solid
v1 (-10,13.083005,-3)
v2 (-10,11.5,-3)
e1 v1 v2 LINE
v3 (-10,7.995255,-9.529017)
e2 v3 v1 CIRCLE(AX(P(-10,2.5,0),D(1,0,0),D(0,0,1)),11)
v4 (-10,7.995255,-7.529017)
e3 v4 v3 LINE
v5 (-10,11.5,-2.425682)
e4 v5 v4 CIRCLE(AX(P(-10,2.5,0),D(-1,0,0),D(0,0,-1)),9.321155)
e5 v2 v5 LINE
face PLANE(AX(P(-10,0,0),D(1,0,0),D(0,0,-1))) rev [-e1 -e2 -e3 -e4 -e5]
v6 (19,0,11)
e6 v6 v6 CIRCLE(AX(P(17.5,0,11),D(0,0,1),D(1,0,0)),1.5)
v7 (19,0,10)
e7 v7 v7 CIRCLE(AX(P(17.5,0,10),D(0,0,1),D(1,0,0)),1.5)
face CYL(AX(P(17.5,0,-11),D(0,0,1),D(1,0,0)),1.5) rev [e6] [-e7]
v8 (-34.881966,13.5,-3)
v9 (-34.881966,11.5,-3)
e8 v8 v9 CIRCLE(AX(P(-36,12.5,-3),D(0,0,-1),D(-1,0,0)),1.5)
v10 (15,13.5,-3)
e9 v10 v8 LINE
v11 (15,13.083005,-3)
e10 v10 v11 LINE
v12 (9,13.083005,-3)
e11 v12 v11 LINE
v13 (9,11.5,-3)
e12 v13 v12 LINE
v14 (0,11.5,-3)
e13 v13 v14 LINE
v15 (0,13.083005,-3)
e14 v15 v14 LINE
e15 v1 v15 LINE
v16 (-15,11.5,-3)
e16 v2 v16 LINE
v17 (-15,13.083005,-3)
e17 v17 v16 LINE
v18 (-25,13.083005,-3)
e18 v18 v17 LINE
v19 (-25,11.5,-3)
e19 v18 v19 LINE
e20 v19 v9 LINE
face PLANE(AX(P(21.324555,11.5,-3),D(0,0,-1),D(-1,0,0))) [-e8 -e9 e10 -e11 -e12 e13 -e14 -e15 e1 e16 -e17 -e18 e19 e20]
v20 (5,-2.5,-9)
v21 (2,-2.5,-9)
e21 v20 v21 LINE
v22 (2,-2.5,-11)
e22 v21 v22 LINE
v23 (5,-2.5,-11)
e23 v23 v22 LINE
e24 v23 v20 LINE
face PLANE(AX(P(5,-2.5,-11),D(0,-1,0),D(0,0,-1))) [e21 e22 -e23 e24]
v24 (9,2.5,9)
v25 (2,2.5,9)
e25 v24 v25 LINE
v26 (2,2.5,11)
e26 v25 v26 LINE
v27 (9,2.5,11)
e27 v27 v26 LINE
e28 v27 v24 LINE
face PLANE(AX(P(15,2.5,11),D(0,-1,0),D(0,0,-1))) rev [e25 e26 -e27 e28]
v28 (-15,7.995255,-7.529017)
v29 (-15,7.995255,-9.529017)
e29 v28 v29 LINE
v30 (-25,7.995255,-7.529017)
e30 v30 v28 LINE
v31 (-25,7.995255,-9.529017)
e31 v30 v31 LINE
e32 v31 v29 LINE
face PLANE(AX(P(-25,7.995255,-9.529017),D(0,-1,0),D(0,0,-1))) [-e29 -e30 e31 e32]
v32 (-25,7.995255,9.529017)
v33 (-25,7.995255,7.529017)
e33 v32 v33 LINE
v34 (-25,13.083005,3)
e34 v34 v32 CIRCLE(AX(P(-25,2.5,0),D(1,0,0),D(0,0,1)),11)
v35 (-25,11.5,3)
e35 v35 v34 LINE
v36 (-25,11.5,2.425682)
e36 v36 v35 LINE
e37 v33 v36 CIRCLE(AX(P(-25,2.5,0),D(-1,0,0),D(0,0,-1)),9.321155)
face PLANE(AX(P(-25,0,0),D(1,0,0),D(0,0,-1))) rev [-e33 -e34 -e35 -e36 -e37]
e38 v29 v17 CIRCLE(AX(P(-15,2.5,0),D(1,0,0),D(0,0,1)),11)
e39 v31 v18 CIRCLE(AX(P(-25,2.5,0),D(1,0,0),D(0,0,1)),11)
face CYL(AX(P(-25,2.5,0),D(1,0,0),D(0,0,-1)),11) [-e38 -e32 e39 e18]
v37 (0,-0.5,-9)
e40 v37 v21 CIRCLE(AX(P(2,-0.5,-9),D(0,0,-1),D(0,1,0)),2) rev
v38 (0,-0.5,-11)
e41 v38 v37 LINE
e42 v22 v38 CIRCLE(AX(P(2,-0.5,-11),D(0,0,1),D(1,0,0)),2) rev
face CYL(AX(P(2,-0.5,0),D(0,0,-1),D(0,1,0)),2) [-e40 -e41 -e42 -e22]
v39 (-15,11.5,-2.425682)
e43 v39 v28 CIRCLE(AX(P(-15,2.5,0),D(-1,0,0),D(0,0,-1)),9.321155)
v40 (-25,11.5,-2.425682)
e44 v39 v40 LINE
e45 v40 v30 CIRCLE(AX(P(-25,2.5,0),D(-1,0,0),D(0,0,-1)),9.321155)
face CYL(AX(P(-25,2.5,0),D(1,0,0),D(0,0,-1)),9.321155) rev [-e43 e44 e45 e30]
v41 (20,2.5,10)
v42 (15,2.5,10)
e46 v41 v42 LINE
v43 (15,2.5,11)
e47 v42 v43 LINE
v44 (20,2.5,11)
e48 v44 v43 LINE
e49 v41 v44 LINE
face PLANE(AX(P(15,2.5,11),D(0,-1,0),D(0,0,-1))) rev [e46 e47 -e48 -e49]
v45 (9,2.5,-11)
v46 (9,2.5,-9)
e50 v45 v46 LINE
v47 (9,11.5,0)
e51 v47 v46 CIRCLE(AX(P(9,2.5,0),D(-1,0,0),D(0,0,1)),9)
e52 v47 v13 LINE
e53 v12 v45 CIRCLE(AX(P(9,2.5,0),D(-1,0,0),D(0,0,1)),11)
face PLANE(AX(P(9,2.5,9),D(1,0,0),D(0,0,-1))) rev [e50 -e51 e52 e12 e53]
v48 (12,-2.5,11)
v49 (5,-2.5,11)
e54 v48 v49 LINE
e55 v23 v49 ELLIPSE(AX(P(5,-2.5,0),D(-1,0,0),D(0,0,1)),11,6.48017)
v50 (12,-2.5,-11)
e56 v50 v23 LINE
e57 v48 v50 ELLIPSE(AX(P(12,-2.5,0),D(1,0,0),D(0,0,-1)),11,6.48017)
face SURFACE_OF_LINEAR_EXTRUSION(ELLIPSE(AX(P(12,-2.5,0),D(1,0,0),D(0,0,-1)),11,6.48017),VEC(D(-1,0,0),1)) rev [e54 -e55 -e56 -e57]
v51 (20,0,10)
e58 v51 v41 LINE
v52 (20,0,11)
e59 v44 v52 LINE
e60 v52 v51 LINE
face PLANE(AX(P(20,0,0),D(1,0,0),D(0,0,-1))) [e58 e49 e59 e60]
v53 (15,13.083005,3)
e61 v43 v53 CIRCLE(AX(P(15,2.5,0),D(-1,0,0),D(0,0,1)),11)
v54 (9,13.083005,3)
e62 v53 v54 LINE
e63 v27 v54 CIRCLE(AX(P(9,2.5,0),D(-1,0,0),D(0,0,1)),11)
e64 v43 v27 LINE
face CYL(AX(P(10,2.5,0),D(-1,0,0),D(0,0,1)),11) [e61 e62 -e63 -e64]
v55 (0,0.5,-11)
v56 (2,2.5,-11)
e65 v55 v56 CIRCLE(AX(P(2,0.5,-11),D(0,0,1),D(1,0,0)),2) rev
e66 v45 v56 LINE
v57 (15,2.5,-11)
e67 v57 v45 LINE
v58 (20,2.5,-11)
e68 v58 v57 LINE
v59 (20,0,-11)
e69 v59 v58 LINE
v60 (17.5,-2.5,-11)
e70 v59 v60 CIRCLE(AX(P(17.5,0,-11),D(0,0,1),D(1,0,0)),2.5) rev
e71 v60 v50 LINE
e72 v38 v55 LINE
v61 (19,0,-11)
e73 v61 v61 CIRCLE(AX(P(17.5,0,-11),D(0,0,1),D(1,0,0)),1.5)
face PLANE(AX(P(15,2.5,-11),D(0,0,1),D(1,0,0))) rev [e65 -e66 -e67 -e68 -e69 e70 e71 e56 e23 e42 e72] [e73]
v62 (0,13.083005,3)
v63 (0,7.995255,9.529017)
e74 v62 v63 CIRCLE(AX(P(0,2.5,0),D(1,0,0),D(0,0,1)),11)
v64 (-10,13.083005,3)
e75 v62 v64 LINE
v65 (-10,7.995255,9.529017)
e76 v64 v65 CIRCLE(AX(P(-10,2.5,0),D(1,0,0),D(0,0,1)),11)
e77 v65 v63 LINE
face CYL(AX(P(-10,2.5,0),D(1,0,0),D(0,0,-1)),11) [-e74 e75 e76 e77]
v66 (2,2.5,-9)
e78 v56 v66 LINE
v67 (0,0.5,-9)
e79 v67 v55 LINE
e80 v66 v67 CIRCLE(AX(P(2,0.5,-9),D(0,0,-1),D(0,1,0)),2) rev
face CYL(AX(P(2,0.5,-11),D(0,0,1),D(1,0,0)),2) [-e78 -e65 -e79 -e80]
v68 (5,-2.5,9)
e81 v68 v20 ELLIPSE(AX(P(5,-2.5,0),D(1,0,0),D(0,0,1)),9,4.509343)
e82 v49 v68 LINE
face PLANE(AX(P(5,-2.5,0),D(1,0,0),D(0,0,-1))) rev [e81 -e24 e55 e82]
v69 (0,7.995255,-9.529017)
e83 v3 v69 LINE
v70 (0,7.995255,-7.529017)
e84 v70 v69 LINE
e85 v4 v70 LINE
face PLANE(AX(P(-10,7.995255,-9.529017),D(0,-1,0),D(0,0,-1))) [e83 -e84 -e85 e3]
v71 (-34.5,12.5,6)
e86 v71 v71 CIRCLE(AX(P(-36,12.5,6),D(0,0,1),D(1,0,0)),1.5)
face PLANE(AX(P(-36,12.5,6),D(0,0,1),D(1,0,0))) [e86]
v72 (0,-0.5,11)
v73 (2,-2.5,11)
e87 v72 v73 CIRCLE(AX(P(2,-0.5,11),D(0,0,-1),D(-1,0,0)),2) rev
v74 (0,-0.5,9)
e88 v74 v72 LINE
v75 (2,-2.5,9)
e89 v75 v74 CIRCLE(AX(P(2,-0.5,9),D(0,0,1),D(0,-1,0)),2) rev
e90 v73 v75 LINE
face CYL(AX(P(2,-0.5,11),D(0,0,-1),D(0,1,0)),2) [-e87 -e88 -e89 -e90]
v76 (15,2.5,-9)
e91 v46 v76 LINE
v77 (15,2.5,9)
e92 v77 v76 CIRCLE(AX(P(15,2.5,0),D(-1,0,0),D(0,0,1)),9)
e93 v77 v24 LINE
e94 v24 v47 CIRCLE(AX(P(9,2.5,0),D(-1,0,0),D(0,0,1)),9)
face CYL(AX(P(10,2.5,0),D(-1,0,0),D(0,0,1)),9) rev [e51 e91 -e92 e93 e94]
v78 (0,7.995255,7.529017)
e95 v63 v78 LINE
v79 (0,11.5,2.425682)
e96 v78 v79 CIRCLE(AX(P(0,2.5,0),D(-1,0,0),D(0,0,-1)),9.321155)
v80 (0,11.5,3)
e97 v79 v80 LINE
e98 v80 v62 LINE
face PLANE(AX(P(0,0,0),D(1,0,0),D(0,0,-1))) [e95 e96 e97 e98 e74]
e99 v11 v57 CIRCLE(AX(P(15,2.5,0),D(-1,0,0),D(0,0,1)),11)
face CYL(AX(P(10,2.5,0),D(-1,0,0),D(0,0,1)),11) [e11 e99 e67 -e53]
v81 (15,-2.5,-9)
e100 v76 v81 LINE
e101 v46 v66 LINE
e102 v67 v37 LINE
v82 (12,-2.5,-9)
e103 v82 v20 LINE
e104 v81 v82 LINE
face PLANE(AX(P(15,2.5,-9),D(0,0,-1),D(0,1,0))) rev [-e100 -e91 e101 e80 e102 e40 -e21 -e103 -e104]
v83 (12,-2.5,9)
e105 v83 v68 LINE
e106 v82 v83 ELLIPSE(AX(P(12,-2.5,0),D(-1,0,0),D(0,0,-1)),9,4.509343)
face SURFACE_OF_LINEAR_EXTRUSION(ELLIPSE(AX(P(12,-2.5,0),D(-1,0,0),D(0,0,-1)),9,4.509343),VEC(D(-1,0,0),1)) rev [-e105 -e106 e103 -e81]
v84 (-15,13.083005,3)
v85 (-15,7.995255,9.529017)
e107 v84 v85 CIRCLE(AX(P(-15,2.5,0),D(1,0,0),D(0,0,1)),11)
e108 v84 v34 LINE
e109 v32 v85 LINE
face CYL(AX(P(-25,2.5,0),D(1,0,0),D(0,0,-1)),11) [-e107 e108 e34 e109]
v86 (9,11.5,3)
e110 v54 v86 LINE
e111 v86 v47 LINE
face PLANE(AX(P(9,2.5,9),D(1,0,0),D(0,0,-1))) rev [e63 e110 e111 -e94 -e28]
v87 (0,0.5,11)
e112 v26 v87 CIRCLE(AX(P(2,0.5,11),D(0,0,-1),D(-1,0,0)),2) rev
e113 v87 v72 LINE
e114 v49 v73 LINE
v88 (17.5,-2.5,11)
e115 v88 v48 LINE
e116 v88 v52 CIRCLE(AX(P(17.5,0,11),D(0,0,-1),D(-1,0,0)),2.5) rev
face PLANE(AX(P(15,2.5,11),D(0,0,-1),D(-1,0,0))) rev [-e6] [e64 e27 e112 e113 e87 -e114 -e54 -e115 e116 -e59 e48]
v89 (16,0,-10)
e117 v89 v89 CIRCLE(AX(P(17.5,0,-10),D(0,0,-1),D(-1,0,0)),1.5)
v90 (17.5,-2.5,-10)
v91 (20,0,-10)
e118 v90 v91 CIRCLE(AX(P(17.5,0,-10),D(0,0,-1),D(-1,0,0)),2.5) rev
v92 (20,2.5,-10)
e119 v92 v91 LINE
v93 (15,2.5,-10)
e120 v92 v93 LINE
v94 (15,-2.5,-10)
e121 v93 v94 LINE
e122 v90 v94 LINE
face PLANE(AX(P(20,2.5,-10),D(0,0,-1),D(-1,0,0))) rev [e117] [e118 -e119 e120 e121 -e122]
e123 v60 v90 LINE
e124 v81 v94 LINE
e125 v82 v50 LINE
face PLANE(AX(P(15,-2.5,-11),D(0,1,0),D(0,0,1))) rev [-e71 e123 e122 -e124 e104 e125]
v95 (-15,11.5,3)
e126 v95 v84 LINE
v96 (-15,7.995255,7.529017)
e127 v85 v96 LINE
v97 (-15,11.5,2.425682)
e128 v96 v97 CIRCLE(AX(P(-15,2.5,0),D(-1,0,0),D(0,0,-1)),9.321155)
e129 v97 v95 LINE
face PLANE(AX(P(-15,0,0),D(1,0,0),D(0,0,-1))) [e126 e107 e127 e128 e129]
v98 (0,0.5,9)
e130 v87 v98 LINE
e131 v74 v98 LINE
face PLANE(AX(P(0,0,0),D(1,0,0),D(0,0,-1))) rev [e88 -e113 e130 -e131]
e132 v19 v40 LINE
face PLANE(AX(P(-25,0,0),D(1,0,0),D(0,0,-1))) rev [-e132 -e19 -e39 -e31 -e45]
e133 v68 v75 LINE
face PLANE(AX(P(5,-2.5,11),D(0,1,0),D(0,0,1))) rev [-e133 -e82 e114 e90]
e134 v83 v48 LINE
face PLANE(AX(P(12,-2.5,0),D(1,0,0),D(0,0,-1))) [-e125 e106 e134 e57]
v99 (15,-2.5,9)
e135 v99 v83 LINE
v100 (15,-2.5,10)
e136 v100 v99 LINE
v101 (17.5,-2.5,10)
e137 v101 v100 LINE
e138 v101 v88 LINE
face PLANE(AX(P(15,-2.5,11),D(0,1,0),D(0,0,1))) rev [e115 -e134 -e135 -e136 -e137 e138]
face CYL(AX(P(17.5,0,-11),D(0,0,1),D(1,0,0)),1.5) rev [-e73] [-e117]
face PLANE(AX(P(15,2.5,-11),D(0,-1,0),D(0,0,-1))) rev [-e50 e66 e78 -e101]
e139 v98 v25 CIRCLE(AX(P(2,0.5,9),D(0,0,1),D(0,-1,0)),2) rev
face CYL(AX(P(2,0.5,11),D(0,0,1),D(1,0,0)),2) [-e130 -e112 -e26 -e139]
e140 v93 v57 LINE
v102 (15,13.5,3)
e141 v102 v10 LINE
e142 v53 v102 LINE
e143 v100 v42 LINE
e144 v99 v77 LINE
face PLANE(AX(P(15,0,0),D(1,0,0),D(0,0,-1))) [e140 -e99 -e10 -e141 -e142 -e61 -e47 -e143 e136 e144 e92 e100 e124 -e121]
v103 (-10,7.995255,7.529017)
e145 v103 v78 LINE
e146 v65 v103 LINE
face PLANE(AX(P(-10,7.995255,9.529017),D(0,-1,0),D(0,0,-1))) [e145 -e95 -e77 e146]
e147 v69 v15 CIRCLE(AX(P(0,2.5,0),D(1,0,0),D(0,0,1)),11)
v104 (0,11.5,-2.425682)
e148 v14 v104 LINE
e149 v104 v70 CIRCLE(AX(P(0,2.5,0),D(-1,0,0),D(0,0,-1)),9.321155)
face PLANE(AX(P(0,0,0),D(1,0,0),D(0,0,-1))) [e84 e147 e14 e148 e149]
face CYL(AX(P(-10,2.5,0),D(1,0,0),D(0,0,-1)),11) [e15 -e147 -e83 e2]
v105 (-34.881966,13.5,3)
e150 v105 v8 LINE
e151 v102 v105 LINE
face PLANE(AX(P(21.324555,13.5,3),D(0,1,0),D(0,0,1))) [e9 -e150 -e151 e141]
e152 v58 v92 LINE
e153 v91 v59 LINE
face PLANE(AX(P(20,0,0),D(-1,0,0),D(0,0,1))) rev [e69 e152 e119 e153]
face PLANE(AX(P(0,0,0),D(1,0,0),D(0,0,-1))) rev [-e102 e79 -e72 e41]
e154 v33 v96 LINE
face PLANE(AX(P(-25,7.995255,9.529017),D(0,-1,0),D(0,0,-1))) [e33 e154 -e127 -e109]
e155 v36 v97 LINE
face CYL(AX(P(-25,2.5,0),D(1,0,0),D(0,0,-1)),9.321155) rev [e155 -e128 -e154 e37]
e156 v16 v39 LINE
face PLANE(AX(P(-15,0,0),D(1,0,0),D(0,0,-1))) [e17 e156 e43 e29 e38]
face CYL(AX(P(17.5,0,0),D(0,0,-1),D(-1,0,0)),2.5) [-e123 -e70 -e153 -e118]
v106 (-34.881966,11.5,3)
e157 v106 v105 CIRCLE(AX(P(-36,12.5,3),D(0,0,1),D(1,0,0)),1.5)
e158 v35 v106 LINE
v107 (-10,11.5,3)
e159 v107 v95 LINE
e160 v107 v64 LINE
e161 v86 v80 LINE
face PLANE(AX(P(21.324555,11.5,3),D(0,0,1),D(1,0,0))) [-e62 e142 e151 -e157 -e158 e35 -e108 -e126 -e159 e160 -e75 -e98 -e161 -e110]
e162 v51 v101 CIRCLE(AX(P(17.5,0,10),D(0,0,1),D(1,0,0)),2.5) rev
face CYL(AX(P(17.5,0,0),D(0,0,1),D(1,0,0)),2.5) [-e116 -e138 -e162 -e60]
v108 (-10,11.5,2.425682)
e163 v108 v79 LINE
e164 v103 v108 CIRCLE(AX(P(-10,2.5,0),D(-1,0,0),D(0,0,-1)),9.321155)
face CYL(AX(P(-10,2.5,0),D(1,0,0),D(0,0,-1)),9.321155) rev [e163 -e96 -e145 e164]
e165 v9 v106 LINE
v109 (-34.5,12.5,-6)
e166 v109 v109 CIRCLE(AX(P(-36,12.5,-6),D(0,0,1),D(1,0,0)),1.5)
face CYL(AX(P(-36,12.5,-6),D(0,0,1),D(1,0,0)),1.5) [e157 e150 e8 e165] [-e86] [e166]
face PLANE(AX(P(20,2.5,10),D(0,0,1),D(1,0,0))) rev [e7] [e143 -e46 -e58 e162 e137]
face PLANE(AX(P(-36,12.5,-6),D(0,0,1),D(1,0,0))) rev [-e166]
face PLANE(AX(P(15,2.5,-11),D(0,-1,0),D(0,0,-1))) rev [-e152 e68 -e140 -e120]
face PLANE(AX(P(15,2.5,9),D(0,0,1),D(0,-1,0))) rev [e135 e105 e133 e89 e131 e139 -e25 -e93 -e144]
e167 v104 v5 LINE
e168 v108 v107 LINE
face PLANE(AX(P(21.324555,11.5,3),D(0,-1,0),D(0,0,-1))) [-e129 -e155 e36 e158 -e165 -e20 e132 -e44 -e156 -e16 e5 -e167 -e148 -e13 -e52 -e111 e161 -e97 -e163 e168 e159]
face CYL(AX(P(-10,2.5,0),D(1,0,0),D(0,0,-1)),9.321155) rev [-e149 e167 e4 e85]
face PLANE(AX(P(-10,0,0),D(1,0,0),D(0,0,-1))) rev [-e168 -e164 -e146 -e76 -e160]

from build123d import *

# Parameters (mm, degrees)
SKETCH1_W                = 2
SKETCH1_H                = 5
BOSS_EXTRUDE1_DEPTH      = 15
BOSS_EXTRUDE1_2_DEPTH    = 15
SKETCH2_W                = 1
SKETCH2_H                = 5
BOSS_EXTRUDE2_DEPTH      = 5
CUT_EXTRUDE1_DEPTH       = 30.107559156
CUT_EXTRUDE1_DEPTH_BACK  = 30.107559156
SKETCH3_R                = 1.5
SWEEP1_START             = 9
SWEEP1_DEPTH             = 6
BOSS_EXTRUDE3_DEPTH      = 12
CUT_EXTRUDE2_DEPTH       = 5
FILLET1_R                = 2
BOSS_EXTRUDE6_START      = -6
SKETCH7_W                = 6
SKETCH7_H                = 2
BOSS_EXTRUDE6_DEPTH      = 51
BOSS_EXTRUDE7_DEPTH      = 3
BOSS_EXTRUDE7_DEPTH_BACK = 9
SKETCH8_R                = 1.5
FILLET2_R                = 2.5
BOSS_EXTRUDE10_DEPTH     = 10
LPATTERN1_COUNT          = 2
LPATTERN1_PITCH          = 15


# Read off the part's stored shape, not the designer's step: Sweep1
with BuildPart() as part:
    # Sketch1 → Boss-Extrude1 (new body)
    with BuildSketch(Plane(origin=(0, 0, 0), x_dir=(0, 0, -1), z_dir=(1, 0, 0))):
        with Locations((-10, 0)):
            Rectangle(SKETCH1_W, SKETCH1_H)
    extrude(amount=BOSS_EXTRUDE1_DEPTH)



with BuildPart() as body_2:
    # Sketch1 → Boss-Extrude1 2 (new body)
    with BuildSketch(Plane(origin=(0, 0, 0), x_dir=(0, 0, -1), z_dir=(1, 0, 0))):
        with Locations((10, 0)):
            Rectangle(SKETCH1_W, SKETCH1_H)
    extrude(amount=BOSS_EXTRUDE1_2_DEPTH)


with BuildPart() as part_1:
    add(part.part)

    add(body_2.part)  # Boss-Extrude2 merges body 2
    # Sketch2 → Boss-Extrude2 (add)
    with BuildSketch(Plane(origin=(15, 0, 0), x_dir=(0, 0, -1), z_dir=(1, 0, 0))):
        with Locations((10.5, 0)):
            Rectangle(SKETCH2_W, SKETCH2_H)
        with Locations((-10.5, 0)):
            Rectangle(SKETCH2_W, SKETCH2_H)
    extrude(amount=BOSS_EXTRUDE2_DEPTH)

    # Sketch3 → Cut-Extrude1 (cut, two sides: drawn at the far end of the back side and taken through both)
    with BuildSketch(Plane.XY.offset(-10).offset(-CUT_EXTRUDE1_DEPTH_BACK)):
        with Locations((17.5, 0)):
            Circle(SKETCH3_R)
    extrude(amount=CUT_EXTRUDE1_DEPTH + CUT_EXTRUDE1_DEPTH_BACK, mode=Mode.SUBTRACT)

    # Sweep1 outline → Sweep1 (add)
    with BuildSketch(Plane.YZ.offset(SWEEP1_START)):
        with BuildLine():
            ThreePointArc((2.5, -11), (13.5, 0), (2.5, 11))
            Line((2.5, 11), (2.5, 9))
            ThreePointArc((2.5, 9), (11.5, 0), (2.5, -9))
            Line((2.5, -9), (2.5, -11))
        make_face()
    extrude(amount=SWEEP1_DEPTH)

    # Sketch5 → Boss-Extrude3 (add)
    with BuildSketch(Plane(origin=(0, 0, 0), x_dir=(0, 0, -1), z_dir=(1, 0, 0))):
        with BuildLine():
            Line((-9, -2.5), (-11, -2.5))
            add(Edge.make_bspline(
                [(-11, -2.5), (-11, -8.980170496), (0, -8.980170496)],
                knots=[3.141592654, 3.141592654, 3.141592654, 4.71238898, 4.71238898, 4.71238898], degree=2, weights=[1, 0.707106781, 1]))
            Line((0, -8.980170496), (0, -7.009343108))
            add(Edge.make_bspline(
                [(-9, -2.5), (-9, -7.009343108), (0, -7.009343108)],
                knots=[3.141592654, 3.141592654, 3.141592654, 4.71238898, 4.71238898, 4.71238898], degree=2, weights=[1, 0.707106781, 1]))
        make_face()
    boss_extrude3 = extrude(amount=BOSS_EXTRUDE3_DEPTH)

    # Sketch6 → Cut-Extrude2 (cut)
    with BuildSketch(Plane.ZY):
        with BuildLine():
            Line((11, -2.5), (9, -2.5))
            add(Edge.make_bspline(
                [(0, -7.009343108), (9, -7.009343108), (9, -2.5)],
                knots=[4.71238898, 4.71238898, 4.71238898, 6.283185307, 6.283185307, 6.283185307], degree=2, weights=[1, 0.707106781, 1]))
            Line((0, -7.009343108), (0, -8.980170496))
            add(Edge.make_bspline(
                [(0, -8.980170496), (11, -8.980170496), (11, -2.5)],
                knots=[4.71238898, 4.71238898, 4.71238898, 6.283185307, 6.283185307, 6.283185307], degree=2, weights=[1, 0.707106781, 1]))
        make_face()
    cut_extrude2 = extrude(amount=-CUT_EXTRUDE2_DEPTH, mode=Mode.SUBTRACT)

    # Mirror2: Boss-Extrude3, Cut-Extrude2 across plane
    add(boss_extrude3.mirror(Plane(origin=(12, -8.980170496, 0), x_dir=(1, 0, 0), z_dir=(0, 0, 1))))
    add(cut_extrude2.mirror(Plane(origin=(12, -8.980170496, 0), x_dir=(1, 0, 0), z_dir=(0, 0, 1))), mode=Mode.SUBTRACT)

    # Fillet1
    fillet1_edges = [part_1.edges().sort_by_distance(p)[0] for p in [
        (0, -2.5, -10),
        (0, 2.5, -10),
        (0, 2.5, 10),
        (0, -2.5, 10),
    ]]
    fillet(fillet1_edges, radius=FILLET1_R)

    # Sketch7 → Boss-Extrude6 (add)
    with BuildSketch(Plane.ZY.offset(-9).offset(BOSS_EXTRUDE6_START)):
        with Locations((0, 12.5)):
            Rectangle(SKETCH7_W, SKETCH7_H)
    extrude(amount=BOSS_EXTRUDE6_DEPTH)

    # Sketch8 → Boss-Extrude7 (add, two sides: drawn at the far end of the back side and taken through both)
    with BuildSketch(Plane.XY.offset(3).offset(-BOSS_EXTRUDE7_DEPTH_BACK)):
        with Locations((-36, 12.5)):
            Circle(SKETCH8_R)
    extrude(amount=BOSS_EXTRUDE7_DEPTH + BOSS_EXTRUDE7_DEPTH_BACK)

    # Fillet2
    fillet2_edges = [part_1.edges().sort_by_distance(p)[0] for p in [
        (20, -2.5, -10.5),
        (20, -2.5, 10.5),
    ]]
    fillet(fillet2_edges, radius=FILLET2_R)

    # 3DSketch3 → Boss-Extrude10 (add)
    with BuildSketch(Plane(origin=(-10, 7.995255445, 9.529017137), x_dir=(0, 0, -1), z_dir=(1, 0, 0))):
        with BuildLine():
            Line((0, 0), (2, 0))
            ThreePointArc((2, 0), (9.529017137, 3.825899604), (17.058034273, 0))
            Line((17.058034273, 0), (19.058034273, 0))
            ThreePointArc((19.058034273, 0), (15.031388903, 4.029654263), (9.529017137, 5.504744555))
            ThreePointArc((9.529017137, 5.504744555), (4.026645371, 4.029654263), (0, 0))
        make_face()
    boss_extrude10 = extrude(amount=BOSS_EXTRUDE10_DEPTH)

    # LPattern1: Boss-Extrude10 ×2
    with Locations(*[(-i * LPATTERN1_PITCH, 0, 0) for i in range(1, LPATTERN1_COUNT)]):
        add(boss_extrude10)


solid = part_1.part
